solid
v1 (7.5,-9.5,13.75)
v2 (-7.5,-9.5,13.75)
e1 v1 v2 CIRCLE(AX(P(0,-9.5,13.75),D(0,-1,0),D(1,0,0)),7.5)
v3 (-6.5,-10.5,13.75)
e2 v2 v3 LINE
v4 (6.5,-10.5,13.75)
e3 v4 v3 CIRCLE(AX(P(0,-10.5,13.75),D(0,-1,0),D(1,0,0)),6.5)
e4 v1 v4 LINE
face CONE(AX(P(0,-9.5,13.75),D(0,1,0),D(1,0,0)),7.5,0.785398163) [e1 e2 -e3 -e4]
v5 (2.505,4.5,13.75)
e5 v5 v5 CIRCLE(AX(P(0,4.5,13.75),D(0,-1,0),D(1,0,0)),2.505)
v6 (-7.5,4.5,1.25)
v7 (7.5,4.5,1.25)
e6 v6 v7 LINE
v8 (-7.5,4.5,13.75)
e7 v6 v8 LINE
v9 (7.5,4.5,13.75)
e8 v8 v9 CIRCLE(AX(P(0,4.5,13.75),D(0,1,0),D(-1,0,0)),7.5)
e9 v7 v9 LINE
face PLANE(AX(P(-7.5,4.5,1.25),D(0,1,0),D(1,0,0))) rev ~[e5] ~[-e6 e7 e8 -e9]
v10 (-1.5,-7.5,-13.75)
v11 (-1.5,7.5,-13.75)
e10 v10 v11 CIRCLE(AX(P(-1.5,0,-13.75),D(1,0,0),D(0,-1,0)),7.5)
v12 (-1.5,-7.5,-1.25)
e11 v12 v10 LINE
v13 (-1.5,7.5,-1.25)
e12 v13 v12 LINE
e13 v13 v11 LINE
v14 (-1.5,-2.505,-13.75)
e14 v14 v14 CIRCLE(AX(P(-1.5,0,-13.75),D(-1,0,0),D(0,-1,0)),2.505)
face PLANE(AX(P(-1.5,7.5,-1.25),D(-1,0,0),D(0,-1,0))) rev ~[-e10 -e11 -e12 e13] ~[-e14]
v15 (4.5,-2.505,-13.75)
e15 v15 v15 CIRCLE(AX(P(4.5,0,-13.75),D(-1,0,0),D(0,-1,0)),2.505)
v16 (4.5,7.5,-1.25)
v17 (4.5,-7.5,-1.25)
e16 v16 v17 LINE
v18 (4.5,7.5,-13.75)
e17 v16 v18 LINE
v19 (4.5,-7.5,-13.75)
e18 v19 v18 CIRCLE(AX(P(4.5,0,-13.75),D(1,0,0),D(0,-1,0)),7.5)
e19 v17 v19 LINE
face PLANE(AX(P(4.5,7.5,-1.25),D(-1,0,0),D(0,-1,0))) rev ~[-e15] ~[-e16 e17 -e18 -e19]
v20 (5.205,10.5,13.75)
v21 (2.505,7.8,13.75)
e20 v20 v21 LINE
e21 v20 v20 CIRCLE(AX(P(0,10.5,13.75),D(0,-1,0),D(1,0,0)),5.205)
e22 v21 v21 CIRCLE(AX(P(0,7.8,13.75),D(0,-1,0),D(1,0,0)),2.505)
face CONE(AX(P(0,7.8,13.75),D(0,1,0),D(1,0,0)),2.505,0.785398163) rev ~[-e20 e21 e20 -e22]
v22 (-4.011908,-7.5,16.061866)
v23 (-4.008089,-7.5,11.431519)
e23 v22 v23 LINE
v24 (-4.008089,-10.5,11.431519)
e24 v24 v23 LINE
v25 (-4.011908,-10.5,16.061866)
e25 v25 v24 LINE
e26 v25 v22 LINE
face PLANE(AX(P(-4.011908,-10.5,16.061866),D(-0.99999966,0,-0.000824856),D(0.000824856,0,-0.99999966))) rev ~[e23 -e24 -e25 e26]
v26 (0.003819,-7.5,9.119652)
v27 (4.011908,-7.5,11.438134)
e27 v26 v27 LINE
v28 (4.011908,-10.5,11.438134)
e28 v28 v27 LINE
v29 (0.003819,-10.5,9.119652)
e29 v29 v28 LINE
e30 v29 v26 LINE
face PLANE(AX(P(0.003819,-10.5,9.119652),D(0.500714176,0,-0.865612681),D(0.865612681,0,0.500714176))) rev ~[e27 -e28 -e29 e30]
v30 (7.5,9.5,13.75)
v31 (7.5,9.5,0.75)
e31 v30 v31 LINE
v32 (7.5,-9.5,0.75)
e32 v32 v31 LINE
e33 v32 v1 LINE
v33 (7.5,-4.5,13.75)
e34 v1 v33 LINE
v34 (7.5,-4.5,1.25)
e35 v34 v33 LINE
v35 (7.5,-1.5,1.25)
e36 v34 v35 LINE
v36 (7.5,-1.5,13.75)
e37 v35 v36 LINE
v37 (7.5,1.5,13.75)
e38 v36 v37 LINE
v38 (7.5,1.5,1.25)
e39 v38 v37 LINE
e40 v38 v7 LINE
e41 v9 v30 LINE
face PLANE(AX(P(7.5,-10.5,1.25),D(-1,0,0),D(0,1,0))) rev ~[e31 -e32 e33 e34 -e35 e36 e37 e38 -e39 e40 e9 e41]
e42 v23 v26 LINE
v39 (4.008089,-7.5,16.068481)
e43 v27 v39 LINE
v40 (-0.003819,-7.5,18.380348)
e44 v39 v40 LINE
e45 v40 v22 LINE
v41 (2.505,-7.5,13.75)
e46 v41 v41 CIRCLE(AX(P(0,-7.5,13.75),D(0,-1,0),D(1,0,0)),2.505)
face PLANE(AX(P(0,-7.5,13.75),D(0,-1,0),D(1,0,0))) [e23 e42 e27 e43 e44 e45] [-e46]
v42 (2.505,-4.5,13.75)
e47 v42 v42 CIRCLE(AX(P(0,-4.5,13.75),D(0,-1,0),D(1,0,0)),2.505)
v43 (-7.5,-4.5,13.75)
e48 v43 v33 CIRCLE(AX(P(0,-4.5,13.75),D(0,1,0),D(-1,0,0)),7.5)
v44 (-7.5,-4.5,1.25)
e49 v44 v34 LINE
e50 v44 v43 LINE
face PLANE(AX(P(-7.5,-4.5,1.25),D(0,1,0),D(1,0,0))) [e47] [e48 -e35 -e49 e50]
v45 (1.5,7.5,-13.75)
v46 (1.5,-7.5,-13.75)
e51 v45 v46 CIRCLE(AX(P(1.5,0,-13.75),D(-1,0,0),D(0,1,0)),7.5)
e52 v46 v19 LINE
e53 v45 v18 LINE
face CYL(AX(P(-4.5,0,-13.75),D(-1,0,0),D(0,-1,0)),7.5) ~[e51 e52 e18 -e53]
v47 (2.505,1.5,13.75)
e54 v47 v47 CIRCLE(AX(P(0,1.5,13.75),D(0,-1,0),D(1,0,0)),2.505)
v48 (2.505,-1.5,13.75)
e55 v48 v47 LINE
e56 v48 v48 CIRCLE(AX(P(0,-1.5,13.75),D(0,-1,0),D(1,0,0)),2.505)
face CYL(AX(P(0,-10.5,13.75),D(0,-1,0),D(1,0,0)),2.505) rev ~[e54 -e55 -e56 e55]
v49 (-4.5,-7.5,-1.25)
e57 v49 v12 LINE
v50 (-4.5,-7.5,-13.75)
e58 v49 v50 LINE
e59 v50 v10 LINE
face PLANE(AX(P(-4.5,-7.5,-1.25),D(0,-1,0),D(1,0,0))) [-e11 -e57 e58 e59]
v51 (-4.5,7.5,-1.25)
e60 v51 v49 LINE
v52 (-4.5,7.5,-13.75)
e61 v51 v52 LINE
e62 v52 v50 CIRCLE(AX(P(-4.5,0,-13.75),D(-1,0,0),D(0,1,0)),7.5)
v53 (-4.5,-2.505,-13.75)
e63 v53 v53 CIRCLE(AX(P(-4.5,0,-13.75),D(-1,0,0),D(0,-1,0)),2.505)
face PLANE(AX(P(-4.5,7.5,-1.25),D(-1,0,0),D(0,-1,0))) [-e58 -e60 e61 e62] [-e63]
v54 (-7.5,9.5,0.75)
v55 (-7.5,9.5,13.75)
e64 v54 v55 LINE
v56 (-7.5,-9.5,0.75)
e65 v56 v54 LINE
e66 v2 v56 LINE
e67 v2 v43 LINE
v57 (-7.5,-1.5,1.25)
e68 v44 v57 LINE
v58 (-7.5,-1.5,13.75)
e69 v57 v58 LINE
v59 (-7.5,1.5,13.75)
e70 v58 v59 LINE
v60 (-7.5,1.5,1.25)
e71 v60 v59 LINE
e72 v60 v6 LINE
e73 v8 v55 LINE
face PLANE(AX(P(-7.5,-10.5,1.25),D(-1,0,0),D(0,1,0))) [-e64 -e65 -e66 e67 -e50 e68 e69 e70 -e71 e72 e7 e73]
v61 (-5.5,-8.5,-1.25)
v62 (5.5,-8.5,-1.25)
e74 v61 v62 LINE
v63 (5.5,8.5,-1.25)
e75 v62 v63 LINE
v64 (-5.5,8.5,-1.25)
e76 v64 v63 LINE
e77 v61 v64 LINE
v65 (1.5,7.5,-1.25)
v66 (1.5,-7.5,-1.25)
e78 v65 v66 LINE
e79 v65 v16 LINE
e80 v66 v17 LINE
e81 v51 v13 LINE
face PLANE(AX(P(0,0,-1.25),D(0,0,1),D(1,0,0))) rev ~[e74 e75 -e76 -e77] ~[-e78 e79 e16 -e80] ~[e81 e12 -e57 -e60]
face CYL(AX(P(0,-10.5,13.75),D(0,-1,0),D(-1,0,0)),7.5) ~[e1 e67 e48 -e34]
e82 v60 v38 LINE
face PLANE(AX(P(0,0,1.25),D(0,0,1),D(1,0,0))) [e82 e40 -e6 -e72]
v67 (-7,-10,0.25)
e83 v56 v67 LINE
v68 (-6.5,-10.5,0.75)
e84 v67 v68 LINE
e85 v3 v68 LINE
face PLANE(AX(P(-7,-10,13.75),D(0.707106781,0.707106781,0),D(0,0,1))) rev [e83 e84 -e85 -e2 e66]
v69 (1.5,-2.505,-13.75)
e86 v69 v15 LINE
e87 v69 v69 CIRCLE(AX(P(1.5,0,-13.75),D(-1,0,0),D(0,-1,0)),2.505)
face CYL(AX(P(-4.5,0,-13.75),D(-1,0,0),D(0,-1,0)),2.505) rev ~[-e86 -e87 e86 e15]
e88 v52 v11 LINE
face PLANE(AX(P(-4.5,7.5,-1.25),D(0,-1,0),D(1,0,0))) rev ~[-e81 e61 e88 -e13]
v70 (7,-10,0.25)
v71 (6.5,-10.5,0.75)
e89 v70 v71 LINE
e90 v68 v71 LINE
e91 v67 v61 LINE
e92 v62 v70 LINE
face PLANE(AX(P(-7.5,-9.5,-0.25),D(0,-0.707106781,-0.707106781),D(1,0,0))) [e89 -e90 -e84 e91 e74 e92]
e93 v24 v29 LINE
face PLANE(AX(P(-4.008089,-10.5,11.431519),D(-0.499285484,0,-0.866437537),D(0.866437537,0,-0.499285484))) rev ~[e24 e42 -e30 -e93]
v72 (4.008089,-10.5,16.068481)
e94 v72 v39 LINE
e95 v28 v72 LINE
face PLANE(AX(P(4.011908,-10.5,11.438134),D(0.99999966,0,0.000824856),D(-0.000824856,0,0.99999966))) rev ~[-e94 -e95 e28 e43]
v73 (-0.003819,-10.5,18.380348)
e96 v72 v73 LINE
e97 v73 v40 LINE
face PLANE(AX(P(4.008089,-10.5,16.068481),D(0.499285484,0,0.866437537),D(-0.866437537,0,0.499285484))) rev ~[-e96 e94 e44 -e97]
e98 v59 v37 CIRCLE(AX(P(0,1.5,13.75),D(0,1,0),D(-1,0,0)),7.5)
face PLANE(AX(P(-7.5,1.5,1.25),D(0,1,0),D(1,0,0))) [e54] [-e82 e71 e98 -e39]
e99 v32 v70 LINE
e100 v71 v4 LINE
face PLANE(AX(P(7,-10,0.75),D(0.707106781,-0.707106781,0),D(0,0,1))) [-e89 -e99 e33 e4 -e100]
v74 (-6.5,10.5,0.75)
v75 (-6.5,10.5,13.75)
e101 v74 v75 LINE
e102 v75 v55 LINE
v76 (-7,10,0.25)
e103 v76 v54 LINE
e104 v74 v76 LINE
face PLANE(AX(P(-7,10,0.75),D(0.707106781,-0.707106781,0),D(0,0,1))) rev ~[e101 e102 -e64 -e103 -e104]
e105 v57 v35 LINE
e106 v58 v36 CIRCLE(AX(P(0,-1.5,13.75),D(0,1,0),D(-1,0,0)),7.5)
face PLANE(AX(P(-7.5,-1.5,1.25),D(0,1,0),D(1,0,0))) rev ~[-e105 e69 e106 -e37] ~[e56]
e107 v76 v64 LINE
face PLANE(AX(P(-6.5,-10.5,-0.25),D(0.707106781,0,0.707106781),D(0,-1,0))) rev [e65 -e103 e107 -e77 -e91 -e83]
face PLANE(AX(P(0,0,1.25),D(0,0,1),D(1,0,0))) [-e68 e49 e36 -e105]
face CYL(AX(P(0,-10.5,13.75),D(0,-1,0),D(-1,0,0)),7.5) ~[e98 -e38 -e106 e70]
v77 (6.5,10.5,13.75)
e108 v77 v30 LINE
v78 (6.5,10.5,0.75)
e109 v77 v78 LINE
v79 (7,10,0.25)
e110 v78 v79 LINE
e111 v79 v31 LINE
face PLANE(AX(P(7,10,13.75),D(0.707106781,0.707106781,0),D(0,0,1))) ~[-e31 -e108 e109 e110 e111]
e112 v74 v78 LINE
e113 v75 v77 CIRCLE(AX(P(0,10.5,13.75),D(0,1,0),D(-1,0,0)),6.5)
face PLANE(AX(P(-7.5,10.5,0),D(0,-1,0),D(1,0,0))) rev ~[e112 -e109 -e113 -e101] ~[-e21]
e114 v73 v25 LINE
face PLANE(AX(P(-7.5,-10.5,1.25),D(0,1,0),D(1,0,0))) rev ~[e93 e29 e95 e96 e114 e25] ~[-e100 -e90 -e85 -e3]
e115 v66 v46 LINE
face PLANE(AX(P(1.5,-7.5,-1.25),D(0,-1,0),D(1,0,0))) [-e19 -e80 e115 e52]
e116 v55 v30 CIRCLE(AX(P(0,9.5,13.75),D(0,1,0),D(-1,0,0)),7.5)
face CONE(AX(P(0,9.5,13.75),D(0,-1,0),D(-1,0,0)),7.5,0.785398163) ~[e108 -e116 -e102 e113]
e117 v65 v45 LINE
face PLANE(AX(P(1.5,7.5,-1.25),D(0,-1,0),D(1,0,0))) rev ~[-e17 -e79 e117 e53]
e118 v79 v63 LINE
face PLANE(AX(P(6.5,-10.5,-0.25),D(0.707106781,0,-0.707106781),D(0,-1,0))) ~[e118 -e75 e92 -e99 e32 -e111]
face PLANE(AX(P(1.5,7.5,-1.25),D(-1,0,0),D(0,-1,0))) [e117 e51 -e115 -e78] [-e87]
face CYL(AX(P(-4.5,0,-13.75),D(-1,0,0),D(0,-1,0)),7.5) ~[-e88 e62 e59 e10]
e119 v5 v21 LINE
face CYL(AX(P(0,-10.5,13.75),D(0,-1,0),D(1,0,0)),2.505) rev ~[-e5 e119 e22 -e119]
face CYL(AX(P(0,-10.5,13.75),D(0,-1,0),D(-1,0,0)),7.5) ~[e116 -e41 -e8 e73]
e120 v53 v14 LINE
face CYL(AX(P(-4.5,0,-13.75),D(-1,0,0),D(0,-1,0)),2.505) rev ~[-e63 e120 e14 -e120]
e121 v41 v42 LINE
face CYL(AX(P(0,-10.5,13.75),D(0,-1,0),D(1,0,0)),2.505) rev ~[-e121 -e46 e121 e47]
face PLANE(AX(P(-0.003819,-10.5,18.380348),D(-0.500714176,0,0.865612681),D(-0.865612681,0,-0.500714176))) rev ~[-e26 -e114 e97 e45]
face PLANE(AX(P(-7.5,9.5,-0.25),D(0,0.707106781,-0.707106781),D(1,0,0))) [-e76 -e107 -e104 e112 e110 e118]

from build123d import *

# Parameters (mm, degrees)
F0_W      = 15
F0_H      = 21
F1_DEPTH  = 1.25
F2_W      = 15
F2_H      = 6
F2_H_2    = 3
F3_DEPTH  = 20
F4_W      = 3
F4_H      = 15
F5_DEPTH  = 20
F6_R      = 2.505
F7_DEPTH  = 25
F8_R      = 2.505
F9_DEPTH  = 25
F10_SIZE  = 2
F11_DEPTH = 3
F12_SIZE  = 2.7
F13_SIZE  = 1


with BuildPart() as f1:
    # F0 (on Top) → F1 (new body, symmetric)
    with BuildSketch(Plane.XY):
        Rectangle(F0_W, F0_H)
    extrude(amount=F1_DEPTH, both=True)

    # F2 (on face) → F3 (join)
    with BuildSketch(Plane.XY.offset(1.25)):
        with Locations((0, -7.5)):
            Rectangle(F2_W, F2_H)
        Rectangle(F2_W, F2_H_2)
        with Locations((0, 7.5)):
            Rectangle(F2_W, F2_H)
    extrude(amount=F3_DEPTH)

    # F4 (on face) → F5 (join)
    with BuildSketch(Plane(origin=(0, 0, -1.25), x_dir=(1, 0, 0), z_dir=(0, 0, -1))):
        with Locations((-3, 0)):
            Rectangle(F4_W, F4_H)
        with Locations((3, 0)):
            Rectangle(F4_W, F4_H)
    extrude(amount=F5_DEPTH)

    # F6 (on face) → F7 (cut)
    with BuildSketch(Plane.XZ.offset(10.5)):
        with BuildLine():
            ThreePointArc((0, 21.25), (5.3033008589, 19.0533008589), (7.5, 13.75))
            Line((7.5, 13.75), (7.5, 21.25))
            Line((7.5, 21.25), (0, 21.25))
        make_face()
        with BuildLine():
            ThreePointArc((-7.5, 13.75), (-5.3033008589, 19.0533008589), (0, 21.25))
            Line((0, 21.25), (-7.5, 21.25))
            Line((-7.5, 21.25), (-7.5, 13.75))
        make_face()
        with Locations((0, 13.75)):
            Circle(F6_R)
    extrude(amount=-F7_DEPTH, mode=Mode.SUBTRACT)

    # F8 (on face) → F9 (cut)
    with BuildSketch(Plane(origin=(-4.5, 0, 0), x_dir=(0, -1, 0), z_dir=(-1, 0, 0))):
        with BuildLine():
            Line((7.5, -21.25), (7.5, -13.75))
            ThreePointArc((7.5, -13.75), (5.3033008589, -19.0533008589), (0, -21.25))
            Line((0, -21.25), (7.5, -21.25))
        make_face()
        with BuildLine():
            ThreePointArc((0, -21.25), (-5.3033008589, -19.0533008589), (-7.5, -13.75))
            Line((-7.5, -13.75), (-7.5, -21.25))
            Line((-7.5, -21.25), (0, -21.25))
        make_face()
        with Locations((0, -13.75)):
            Circle(F8_R)
    extrude(amount=-F9_DEPTH, mode=Mode.SUBTRACT)

    # F10
    f10_edges = [f1.edges().sort_by_distance(p)[0] for p in [
        (-7.5, 0, -1.25),
        (0, 10.5, -1.25),
        (0, -10.5, -1.25),
        (7.5, 0, -1.25),
    ]]
    chamfer(f10_edges, length=F10_SIZE)

    # F6 (on face) → F11 (cut)
    with BuildSketch(Plane.XZ.offset(10.5)):
        Polygon((4.0080889509, 16.0684814631), (-0.0038193698, 18.3803475837), (-4.0119083207, 16.0618661206), (-4.0080889509, 11.4315185369), (0.0038193698, 9.1196524163), (4.0119083207, 11.4381338794), align=None)
        with Locations((0, 13.75)):
            Circle(F6_R, mode=Mode.SUBTRACT)
    extrude(amount=-F11_DEPTH, mode=Mode.SUBTRACT)

    # F12
    f12_edges = [f1.edges().sort_by_distance(p)[0] for p in [
        (-2.505, 10.5, 13.75),
    ]]
    chamfer(f12_edges, length=F12_SIZE)

    # F13
    f13_edges = [f1.edges().sort_by_distance(p)[0] for p in [
        (0, 10.5, 21.25),
        (7.5, 10.5, 7.25),
        (-7.5, 10.5, 7.25),
        (7.5, -10.5, 7.25),
        (-7.5, -10.5, 7.25),
        (0, -10.5, 21.25),
    ]]
    chamfer(f13_edges, length=F13_SIZE)


solid = f1.part
